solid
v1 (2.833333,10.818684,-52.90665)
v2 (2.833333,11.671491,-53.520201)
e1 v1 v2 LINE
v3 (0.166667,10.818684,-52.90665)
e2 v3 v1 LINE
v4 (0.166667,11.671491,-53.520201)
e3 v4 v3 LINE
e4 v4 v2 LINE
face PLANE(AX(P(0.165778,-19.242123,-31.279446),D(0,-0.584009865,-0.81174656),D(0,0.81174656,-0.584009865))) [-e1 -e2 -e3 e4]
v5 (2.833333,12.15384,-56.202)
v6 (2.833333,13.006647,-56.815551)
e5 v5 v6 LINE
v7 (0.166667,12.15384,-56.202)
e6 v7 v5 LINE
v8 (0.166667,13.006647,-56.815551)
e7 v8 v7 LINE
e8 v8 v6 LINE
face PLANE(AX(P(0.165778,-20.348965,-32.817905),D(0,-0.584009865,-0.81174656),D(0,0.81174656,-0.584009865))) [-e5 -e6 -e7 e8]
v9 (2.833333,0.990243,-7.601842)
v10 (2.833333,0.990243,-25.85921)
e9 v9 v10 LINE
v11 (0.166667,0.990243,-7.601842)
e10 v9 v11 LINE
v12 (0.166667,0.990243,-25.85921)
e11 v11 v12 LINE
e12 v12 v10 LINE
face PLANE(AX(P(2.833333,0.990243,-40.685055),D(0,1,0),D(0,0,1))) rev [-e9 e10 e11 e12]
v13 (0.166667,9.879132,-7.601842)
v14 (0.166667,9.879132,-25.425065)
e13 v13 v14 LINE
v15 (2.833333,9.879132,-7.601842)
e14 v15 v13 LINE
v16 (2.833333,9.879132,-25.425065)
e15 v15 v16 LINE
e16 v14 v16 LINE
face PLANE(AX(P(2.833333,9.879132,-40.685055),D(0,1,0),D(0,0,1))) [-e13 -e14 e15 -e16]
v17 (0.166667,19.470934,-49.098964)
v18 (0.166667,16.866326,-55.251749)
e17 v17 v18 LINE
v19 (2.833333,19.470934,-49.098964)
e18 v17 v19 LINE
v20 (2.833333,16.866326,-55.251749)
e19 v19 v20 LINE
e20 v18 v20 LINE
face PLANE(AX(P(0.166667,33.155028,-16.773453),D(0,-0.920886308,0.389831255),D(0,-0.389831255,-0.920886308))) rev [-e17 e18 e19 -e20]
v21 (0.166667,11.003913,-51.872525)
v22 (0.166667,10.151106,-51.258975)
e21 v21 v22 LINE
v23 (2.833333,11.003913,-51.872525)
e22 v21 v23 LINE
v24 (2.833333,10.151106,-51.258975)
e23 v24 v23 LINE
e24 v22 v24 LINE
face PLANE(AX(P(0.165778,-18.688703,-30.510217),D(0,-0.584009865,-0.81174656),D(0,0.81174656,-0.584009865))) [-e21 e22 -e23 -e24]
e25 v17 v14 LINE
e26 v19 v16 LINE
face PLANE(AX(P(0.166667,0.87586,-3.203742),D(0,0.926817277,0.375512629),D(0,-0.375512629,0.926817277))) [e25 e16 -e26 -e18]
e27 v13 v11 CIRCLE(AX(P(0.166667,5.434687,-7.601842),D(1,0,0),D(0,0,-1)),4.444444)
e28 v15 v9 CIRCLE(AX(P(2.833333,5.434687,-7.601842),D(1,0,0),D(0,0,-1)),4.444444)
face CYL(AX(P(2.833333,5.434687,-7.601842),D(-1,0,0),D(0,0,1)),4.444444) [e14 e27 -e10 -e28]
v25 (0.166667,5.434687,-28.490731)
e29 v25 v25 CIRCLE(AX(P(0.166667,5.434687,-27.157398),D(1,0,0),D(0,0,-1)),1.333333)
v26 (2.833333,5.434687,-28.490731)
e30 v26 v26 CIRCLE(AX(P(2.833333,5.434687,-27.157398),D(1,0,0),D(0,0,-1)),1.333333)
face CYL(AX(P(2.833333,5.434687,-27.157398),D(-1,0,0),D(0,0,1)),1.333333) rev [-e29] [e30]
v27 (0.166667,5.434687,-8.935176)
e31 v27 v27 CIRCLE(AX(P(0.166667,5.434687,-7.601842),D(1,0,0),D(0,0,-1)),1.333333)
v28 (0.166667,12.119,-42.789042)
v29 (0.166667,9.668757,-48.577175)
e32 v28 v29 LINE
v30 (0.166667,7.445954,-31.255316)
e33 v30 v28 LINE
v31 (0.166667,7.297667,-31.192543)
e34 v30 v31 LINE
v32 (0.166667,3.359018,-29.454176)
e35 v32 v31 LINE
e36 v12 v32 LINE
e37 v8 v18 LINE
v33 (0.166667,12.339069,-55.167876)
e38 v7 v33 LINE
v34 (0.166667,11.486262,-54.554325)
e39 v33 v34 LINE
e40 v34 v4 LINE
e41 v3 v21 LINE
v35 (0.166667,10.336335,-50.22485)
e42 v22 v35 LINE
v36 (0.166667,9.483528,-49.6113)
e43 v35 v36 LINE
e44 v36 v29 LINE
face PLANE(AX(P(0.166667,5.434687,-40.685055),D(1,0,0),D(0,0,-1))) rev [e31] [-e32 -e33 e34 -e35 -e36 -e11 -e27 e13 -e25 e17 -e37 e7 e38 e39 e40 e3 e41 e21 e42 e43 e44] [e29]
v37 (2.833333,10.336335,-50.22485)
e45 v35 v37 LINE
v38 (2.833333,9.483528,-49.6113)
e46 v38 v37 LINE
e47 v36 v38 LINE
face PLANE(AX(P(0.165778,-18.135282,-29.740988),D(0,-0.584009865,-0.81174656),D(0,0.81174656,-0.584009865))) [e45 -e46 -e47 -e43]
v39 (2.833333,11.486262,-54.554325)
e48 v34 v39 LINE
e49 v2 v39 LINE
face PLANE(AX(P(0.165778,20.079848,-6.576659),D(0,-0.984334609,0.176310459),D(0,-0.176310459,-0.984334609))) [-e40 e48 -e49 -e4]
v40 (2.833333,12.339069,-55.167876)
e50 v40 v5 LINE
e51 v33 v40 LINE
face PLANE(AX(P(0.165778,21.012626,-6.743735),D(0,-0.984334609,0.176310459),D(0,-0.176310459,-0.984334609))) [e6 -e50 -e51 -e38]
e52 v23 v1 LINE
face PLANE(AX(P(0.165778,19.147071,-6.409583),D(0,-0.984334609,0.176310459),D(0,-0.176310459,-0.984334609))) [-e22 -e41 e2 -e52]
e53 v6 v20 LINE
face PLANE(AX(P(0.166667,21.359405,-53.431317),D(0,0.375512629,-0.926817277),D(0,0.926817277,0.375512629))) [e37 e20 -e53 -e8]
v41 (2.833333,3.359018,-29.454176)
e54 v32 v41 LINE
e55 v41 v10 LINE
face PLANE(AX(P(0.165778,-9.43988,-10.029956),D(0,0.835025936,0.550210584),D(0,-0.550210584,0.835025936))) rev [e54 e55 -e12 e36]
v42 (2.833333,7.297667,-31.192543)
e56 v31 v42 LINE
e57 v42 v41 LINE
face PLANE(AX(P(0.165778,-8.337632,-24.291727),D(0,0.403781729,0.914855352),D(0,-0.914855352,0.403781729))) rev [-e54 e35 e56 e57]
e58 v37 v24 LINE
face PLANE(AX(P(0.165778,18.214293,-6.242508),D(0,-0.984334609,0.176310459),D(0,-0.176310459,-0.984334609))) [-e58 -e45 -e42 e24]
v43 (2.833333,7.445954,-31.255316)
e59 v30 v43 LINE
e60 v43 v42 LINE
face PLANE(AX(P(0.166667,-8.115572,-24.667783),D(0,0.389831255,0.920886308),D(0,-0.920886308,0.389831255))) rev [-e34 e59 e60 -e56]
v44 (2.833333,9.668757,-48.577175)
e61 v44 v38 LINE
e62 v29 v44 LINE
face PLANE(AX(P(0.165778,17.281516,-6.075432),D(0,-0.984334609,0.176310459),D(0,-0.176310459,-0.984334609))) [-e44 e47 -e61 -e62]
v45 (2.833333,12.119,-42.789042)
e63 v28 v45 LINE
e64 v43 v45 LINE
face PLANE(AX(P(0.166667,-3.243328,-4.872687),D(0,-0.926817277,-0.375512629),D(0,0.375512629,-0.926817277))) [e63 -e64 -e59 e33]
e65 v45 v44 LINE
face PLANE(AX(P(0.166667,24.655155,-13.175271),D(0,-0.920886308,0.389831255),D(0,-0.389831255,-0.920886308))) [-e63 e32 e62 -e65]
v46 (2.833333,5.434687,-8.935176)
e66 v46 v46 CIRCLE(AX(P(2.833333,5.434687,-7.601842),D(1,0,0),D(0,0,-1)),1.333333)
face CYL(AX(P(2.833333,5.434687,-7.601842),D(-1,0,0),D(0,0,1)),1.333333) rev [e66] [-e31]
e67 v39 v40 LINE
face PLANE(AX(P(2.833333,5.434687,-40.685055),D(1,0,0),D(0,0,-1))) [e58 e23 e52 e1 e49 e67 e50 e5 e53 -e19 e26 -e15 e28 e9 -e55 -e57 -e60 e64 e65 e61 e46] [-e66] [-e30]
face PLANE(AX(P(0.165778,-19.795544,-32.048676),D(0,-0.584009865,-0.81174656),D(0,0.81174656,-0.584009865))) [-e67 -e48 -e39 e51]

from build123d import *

# Parameters (mm, degrees)
SKETCH1_R             = 5
SKETCH1_R_2           = 1.5
BOSS_EXTRUDE1_DEPTH   = 3
BOSS_EXTRUDE2_START   = -3
BOSS_EXTRUDE2_DEPTH   = 3
CUT_EXTRUDE2_DEPTH    = 65.81382707
CORTAR_EXTRUIR1_DEPTH = 3
SCALE1_SCALE          = 0.888888889


# Read off the part's stored shape, not the designer's step: Cortar-Extruir1
with BuildPart() as part:
    # Sketch1 → Boss-Extrude1 (new body)
    # profile 1 of 3: a face of its own
    with BuildSketch(Plane(origin=(0, 0, 0), x_dir=(0, 0, -1), z_dir=(1, 0, 0))):
        with Locations((5, 5)):
            Circle(SKETCH1_R)
        with Locations((5, 5)):
            Circle(SKETCH1_R_2, mode=Mode.SUBTRACT)
    # profile 2 of 3: a face of its own
    with BuildSketch(Plane(origin=(0, 0, 0), x_dir=(0, 0, -1), z_dir=(1, 0, 0))):
        with BuildLine():
            ThreePointArc((10, 5), (8.535533906, 1.464466094), (5, 0))
            Line((5, 0), (27, 0))
            ThreePointArc((27, 0), (22, 5), (27, 10))
            Line((27, 10), (5, 10))
            ThreePointArc((5, 10), (8.535533906, 8.535533906), (10, 5))
        make_face()
    # profile 3 of 3: a face of its own
    with BuildSketch(Plane(origin=(0, 0, 0), x_dir=(0, 0, -1), z_dir=(1, 0, 0))):
        with Locations((27, 5)):
            Circle(SKETCH1_R)
        with Locations((27, 5)):
            Circle(SKETCH1_R_2, mode=Mode.SUBTRACT)
    extrude(amount=BOSS_EXTRUDE1_DEPTH)

    # Sketch2 → Boss-Extrude2 (add)
    with BuildSketch(Plane(origin=(3, 0, 0), x_dir=(0, 0, -1), z_dir=(1, 0, 0)).offset(BOSS_EXTRUDE2_START)):
        with BuildLine():
            ThreePointArc((27, 10), (29.694507461, 9.21184396), (31.53953799, 7.095851816))
            Line((31.53953799, 7.095851816), (31.610157793, 7.262674791))
            Line((31.610157793, 7.262674791), (44.585599673, 12.519851602))
            Line((44.585599673, 12.519851602), (51.097249205, 9.763328363))
            Line((51.097249205, 9.763328363), (60.365421977, 13.518454657))
            Line((60.365421977, 13.518454657), (56.610295683, 22.786627428))
            Line((56.610295683, 22.786627428), (25.051124858, 10))
            Line((25.051124858, 10), (27, 10))
        make_face()
        Polygon((60.365421977, 13.518454657), (51.097249205, 9.763328363), (51.333822162, 9.179433479), (60.601994933, 12.934559772), align=None)
    extrude(amount=BOSS_EXTRUDE2_DEPTH)

    # Sketch4 → Cut-Extrude2 (cut, through all)
    with BuildSketch(Plane(origin=(3, 0, 0), x_dir=(0, 0, -1), z_dir=(1, 0, 0))):
        Polygon((56.610295683, 22.786627428), (51.684261855, 20.790777803), (58.606145308, 17.8605936), align=None)
    extrude(amount=-CUT_EXTRUDE2_DEPTH, mode=Mode.SUBTRACT)

    # Cortar-Extruir1 outline → Cortar-Extruir1 (cut)
    with BuildSketch(Plane.YZ):
        with BuildLine():
            ThreePointArc((0, -27), (2.305492538, -31.21184396), (7.095851816, -31.53953799))
            Line((7.095851816, -31.53953799), (2.664871714, -29.583874941))
            Line((2.664871714, -29.583874941), (0, -25.53953799))
            Line((0, -25.53953799), (0, -27))
        make_face()
        Polygon((13.518454657, -60.365421977), (12.559047143, -59.675177656), (12.934559772, -60.601994933), align=None)
        Polygon((12.767429398, -58.511787422), (11.808021884, -57.821543102), (12.559047143, -59.675177656), align=None)
        Polygon((12.01640414, -56.658152868), (11.056996626, -55.967908548), (11.808021884, -57.821543102), align=None)
        Polygon((11.265378881, -54.804518314), (10.305971367, -54.114273993), (11.056996626, -55.967908548), align=None)
        Polygon((10.514353622, -52.95088376), (9.554946108, -52.260639439), (10.305971367, -54.114273993), align=None)
        Polygon((9.554946108, -52.260639439), (9.763328363, -51.097249205), (9.179433479, -51.333822162), align=None)
    extrude(amount=CORTAR_EXTRUIR1_DEPTH, mode=Mode.SUBTRACT)


with BuildPart() as part_1:
    # Scale1: scaled about (1.5, 8.912185075, -28.416581742)
    add(part.part.scale(SCALE1_SCALE).moved(Location((0.166666667, 0.990242786, -3.157397971))))


solid = part_1.part
